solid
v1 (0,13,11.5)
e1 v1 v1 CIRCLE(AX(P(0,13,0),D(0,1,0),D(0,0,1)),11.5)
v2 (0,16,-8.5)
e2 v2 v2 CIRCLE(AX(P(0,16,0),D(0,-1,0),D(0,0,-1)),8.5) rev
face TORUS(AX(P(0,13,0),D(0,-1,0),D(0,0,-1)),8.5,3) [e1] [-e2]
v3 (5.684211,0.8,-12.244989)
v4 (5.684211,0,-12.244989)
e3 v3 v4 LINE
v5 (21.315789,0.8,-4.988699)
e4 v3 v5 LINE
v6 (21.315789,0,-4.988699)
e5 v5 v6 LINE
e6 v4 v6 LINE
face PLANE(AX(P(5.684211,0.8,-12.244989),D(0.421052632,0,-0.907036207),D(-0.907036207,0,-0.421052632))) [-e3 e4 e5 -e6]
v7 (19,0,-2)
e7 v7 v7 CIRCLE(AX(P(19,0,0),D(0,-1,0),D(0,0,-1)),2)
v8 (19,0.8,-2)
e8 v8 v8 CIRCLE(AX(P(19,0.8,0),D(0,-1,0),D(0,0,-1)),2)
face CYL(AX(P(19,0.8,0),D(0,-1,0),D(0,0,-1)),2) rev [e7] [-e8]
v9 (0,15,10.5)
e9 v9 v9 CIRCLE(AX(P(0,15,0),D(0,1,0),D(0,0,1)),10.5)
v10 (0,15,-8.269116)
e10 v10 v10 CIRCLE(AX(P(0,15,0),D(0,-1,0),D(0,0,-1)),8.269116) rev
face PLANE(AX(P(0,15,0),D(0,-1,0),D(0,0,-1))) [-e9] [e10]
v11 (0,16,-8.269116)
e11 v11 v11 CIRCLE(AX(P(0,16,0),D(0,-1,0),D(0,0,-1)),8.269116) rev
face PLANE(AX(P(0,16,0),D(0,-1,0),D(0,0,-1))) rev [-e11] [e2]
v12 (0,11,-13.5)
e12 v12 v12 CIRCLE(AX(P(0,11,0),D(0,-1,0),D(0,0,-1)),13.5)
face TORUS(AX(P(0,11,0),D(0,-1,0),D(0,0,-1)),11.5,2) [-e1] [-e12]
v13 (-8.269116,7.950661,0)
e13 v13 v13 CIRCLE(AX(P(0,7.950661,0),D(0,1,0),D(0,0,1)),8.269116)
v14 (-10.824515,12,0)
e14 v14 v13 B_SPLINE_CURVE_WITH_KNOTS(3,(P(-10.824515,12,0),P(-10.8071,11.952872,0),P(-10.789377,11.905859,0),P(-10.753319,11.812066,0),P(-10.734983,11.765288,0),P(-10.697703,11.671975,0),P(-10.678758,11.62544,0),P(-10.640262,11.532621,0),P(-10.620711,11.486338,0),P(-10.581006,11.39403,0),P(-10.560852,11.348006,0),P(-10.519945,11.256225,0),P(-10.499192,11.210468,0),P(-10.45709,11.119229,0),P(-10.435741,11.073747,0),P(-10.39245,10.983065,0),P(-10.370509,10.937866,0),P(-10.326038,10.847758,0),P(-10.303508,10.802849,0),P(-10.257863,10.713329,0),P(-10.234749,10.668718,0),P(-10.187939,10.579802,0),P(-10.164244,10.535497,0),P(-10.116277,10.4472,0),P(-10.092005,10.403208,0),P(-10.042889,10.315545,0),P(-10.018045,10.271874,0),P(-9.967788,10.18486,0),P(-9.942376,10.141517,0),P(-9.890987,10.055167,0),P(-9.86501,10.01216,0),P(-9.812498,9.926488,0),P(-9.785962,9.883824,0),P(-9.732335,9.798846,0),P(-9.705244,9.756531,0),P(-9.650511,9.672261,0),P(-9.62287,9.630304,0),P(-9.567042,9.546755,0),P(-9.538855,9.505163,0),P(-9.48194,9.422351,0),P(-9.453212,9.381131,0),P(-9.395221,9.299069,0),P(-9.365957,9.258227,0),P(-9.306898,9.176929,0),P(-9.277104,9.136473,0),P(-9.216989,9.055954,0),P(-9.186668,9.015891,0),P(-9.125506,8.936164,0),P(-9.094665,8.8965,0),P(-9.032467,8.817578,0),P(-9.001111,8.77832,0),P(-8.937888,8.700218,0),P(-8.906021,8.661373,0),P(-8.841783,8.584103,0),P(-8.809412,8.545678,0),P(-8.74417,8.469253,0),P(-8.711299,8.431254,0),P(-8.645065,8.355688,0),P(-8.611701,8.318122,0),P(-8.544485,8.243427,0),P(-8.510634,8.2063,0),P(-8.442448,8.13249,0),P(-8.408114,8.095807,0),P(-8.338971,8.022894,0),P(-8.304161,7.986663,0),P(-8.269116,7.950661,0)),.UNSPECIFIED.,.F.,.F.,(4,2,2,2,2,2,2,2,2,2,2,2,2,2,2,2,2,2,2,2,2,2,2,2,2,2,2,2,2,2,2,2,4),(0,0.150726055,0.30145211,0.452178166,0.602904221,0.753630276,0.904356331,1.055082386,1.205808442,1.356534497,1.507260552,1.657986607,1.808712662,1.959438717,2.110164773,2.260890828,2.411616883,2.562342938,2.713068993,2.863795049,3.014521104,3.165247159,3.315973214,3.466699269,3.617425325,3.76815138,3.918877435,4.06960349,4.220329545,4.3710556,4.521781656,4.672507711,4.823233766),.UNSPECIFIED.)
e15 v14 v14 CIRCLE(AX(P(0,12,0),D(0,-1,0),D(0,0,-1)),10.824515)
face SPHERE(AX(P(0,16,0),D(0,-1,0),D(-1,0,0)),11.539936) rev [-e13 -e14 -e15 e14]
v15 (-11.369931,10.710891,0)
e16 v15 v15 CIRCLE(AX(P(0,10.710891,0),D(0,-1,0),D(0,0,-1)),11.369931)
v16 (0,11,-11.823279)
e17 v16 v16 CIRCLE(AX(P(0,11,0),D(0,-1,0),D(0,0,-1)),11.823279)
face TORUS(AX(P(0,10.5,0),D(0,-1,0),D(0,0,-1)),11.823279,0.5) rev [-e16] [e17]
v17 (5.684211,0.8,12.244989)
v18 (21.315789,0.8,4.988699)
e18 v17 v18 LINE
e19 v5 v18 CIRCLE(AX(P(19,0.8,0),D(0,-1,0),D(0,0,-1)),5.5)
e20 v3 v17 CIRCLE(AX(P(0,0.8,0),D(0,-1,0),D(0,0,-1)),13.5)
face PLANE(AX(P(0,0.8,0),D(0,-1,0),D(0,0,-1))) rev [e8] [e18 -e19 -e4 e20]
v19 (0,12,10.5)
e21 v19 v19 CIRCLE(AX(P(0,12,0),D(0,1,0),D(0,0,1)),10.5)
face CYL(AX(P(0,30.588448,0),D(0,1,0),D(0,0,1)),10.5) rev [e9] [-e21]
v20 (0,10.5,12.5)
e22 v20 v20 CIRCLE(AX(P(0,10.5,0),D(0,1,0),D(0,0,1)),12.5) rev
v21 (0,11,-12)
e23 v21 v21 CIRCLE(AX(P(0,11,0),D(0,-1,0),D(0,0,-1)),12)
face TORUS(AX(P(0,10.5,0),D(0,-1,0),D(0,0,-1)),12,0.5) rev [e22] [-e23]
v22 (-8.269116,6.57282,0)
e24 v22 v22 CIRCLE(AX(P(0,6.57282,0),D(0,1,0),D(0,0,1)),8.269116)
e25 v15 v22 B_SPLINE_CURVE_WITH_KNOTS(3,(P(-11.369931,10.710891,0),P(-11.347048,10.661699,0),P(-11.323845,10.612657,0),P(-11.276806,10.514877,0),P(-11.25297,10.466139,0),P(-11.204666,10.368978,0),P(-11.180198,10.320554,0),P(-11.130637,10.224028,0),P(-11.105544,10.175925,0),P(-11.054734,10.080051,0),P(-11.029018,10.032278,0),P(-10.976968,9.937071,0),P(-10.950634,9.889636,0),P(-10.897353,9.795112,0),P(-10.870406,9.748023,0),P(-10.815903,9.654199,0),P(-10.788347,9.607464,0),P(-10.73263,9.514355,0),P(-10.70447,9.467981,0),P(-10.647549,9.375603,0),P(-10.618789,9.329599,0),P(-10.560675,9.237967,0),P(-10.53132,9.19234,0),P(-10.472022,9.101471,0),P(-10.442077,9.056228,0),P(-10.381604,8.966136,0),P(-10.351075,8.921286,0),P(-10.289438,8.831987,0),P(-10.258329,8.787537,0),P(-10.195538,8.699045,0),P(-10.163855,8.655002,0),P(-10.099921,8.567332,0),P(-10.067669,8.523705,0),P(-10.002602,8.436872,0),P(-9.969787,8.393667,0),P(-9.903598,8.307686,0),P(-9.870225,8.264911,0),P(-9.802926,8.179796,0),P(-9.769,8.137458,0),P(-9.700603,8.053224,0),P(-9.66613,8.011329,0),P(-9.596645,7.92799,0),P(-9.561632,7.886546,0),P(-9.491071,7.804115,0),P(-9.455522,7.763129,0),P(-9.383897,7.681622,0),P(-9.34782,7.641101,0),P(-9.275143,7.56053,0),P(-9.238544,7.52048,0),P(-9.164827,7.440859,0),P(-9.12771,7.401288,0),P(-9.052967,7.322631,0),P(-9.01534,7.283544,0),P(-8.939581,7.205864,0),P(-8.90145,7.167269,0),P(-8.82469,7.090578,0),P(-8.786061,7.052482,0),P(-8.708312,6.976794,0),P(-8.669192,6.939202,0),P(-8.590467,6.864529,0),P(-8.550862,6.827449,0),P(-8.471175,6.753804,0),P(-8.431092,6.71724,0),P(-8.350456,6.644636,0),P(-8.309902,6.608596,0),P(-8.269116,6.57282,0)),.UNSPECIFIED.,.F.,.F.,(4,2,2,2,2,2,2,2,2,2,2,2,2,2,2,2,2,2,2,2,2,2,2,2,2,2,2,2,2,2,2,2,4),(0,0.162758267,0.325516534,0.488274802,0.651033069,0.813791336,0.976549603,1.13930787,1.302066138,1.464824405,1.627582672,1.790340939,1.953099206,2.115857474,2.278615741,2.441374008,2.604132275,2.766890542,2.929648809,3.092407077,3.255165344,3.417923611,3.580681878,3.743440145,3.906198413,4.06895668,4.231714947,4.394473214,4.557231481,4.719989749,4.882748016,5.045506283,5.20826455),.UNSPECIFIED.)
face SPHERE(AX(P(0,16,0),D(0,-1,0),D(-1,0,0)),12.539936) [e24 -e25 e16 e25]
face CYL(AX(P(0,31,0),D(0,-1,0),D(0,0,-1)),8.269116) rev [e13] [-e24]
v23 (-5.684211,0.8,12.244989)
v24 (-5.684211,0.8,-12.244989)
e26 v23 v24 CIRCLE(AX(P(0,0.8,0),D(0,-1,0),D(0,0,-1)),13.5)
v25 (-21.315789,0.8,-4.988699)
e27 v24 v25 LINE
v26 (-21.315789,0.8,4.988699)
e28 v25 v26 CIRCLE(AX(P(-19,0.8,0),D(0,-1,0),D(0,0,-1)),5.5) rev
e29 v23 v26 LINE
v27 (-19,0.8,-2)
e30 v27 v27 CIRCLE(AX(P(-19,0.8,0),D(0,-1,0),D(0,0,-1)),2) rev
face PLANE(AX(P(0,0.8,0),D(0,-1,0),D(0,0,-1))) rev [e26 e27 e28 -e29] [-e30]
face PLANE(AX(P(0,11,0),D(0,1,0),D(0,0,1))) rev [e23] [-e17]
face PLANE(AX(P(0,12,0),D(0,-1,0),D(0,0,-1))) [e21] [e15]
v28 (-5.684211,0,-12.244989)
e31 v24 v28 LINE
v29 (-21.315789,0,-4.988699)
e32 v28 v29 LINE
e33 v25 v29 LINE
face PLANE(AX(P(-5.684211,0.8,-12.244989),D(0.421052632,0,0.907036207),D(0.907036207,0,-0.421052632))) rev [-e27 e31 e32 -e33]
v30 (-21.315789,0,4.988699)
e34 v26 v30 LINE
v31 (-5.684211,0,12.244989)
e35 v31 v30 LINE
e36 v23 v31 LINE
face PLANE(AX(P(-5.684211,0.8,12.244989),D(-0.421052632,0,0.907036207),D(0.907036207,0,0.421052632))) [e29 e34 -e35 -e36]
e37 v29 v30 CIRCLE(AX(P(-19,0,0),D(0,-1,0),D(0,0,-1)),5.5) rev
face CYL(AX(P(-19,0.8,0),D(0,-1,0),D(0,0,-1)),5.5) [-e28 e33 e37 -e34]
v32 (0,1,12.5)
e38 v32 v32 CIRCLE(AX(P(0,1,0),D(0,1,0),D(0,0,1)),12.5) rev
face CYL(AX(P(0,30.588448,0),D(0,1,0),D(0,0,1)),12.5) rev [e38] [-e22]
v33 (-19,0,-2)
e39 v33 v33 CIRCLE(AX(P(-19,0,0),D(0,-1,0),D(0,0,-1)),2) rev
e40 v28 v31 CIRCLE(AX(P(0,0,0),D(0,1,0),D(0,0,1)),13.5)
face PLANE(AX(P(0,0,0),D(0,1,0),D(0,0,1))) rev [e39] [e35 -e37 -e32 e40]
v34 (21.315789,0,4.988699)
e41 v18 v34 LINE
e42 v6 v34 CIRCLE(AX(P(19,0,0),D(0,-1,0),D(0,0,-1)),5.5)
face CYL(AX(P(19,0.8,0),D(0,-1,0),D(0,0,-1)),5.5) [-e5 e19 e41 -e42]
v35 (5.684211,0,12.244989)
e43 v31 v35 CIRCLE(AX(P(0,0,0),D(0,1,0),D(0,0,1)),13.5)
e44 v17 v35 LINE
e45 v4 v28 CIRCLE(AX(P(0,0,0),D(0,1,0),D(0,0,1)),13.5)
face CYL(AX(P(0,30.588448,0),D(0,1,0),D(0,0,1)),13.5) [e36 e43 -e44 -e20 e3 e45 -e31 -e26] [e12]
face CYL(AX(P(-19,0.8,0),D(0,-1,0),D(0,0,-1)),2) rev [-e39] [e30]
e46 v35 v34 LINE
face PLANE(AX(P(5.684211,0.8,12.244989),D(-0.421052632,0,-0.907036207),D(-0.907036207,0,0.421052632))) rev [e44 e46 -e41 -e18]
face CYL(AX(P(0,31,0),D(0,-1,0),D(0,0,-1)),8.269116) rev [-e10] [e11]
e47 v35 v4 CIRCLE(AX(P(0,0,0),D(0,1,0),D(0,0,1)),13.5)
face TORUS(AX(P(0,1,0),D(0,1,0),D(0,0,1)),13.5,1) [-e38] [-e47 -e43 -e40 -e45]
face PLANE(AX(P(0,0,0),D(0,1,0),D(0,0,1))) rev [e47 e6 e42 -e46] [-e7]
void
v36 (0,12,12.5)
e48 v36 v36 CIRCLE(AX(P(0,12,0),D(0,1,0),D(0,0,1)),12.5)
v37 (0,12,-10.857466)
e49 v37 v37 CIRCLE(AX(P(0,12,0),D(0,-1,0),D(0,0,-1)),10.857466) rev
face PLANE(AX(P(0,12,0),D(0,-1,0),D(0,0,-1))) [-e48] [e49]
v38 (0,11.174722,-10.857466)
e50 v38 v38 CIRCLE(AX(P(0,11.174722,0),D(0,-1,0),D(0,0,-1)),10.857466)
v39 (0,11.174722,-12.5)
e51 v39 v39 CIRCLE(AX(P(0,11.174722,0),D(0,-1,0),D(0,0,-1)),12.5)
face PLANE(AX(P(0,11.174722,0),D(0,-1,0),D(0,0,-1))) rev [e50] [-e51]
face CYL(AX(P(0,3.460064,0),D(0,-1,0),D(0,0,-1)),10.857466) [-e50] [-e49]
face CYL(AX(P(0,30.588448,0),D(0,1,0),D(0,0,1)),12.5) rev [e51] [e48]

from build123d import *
from build123d.topology import SkipClean

# Parameters (mm, degrees)
FILLET_1_R          = 2
FILLET_2_R          = 3
EXTRUDE_START       = -0.8
SKETCH_2_R          = 2
EXTRUDE_1_DEPTH     = 0.8
FILLET_3_R          = 1
SKETCH_5_R          = 8.269115691
CUT_EXTRUDE_1_DEPTH = 15


with BuildPart() as part:
    # 草图1 → 旋转1 (revolve)
    with BuildSketch(Plane.XY, mode=Mode.PRIVATE) as revolve_1_sk:
        with BuildLine():
            Line((0, 1), (0, 0))
            Line((0, 0), (13.5, 0))
            Line((13.5, 0), (13.5, 13))
            Line((13.5, 13), (11.5, 13))
            Line((11.5, 13), (11.5, 16))
            Line((11.5, 16), (8.000244137, 16))
            ThreePointArc((8.000244137, 16), (5.65702688, 21.65702688), (0, 24.000244137))
            Line((0, 24.000244137), (0, 7.999755863))
            ThreePointArc((0, 7.999755863), (5.291675638, 9.99982707), (7.9375, 15))
            Line((7.9375, 15), (10.5, 15))
            Line((10.5, 15), (10.5, 12))
            Line((10.5, 12), (12.5, 12))
            Line((12.5, 12), (12.5, 1))
            Line((12.5, 1), (0, 1))
        make_face()
    revolve(revolve_1_sk.sketch.rotate(Axis((0, 30.588447592, 0), (0, -1, 0)), 90), axis=Axis((0, 30.588447592, 0), (0, -1, 0)))

    # 圆角1
    fillet_1_edges = [part.edges().sort_by_distance(p)[0] for p in [
        (0, 13, -13.5),
    ]]
    fillet(fillet_1_edges, radius=FILLET_1_R - 0.0001)  # a hair under: the kernel refuses the full size

    # 圆角2
    fillet_2_edges = [part.edges().sort_by_distance(p)[0] for p in [
        (0, 16, -11.5),
    ]]
    fillet(fillet_2_edges, radius=FILLET_2_R - 0.0001)  # a hair under: the kernel refuses the full size

    # 草图2 → 凸台-拉伸1 (add)
    # profile 1 of 2: a face of its own
    with BuildSketch(Plane.XZ.offset(EXTRUDE_START)):
        with BuildLine():
            ThreePointArc((-5.684210526, -12.244988799), (-13.5, 0), (-5.684210526, 12.244988799))
            Line((-5.684210526, 12.244988799), (-21.315789474, 4.98869914))
            ThreePointArc((-21.315789474, 4.98869914), (-24.5, 0), (-21.315789474, -4.98869914))
            Line((-21.315789474, -4.98869914), (-5.684210526, -12.244988799))
        make_face()
        with Locations(Location((-19, 0, 0), (0, 0, 270))):
            Circle(SKETCH_2_R, mode=Mode.SUBTRACT)
    # profile 2 of 2: a face of its own
    with BuildSketch(Plane.XZ.offset(EXTRUDE_START)):
        with BuildLine():
            Line((21.315789474, 4.98869914), (5.684210526, 12.244988799))
            ThreePointArc((5.684210526, 12.244988799), (11.379517611, 7.263372422), (13.5, 0))
            ThreePointArc((13.5, 0), (11.379517611, -7.263372422), (5.684210526, -12.244988799))
            Line((5.684210526, -12.244988799), (21.315789474, -4.98869914))
            ThreePointArc((21.315789474, -4.98869914), (24.5, 0), (21.315789474, 4.98869914))
        make_face()
        with Locations(Location((19, 0, 0), (0, 0, 270))):
            Circle(SKETCH_2_R, mode=Mode.SUBTRACT)
    extrude(amount=EXTRUDE_1_DEPTH)

    # 草图3 → 切除-旋转1 (revolve, cut)
    with SkipClean():  # the faces are left unmerged after this step: merging them gives an invalid solid
        with BuildSketch(Plane.XY):
            with BuildLine():
                Line((0, 0), (12.5, 0))
                Line((12.5, 0), (12.5, 10.5))
                ThreePointArc((12.5, 10.5), (12.353553391, 10.853553391), (12, 11))
                Line((12, 11), (11.823279418, 11))
                ThreePointArc((11.823279418, 11), (11.554434948, 10.921571643), (11.369930597, 10.710890602))
                ThreePointArc((11.369930597, 10.710890602), (6.742585023, 5.427036971), (0, 3.460063796))
                Line((0, 3.460063796), (0, 0))
            make_face()
        revolve(axis=Axis((0, 3.460063796, 0), (0, -1, 0)), mode=Mode.SUBTRACT)

    # 草图4 → 旋转2 (revolve)
    with SkipClean():  # the faces are left unmerged after this step: merging them gives an invalid solid
        with BuildSketch(Plane.XY, mode=Mode.PRIVATE) as revolve_2_sk:
            with BuildLine():
                ThreePointArc((0, 4.460063796), (6.63523651, 6.558402463), (10.857466035, 12.090324963))
                Line((10.857466035, 12.090324963), (10.857466035, 11.174722069))
                Line((10.857466035, 11.174722069), (12.5, 11.174722069))
                Line((12.5, 11.174722069), (12.5, 10.5))
                ThreePointArc((12.5, 10.5), (12.353553391, 10.853553391), (12, 11))
                Line((12, 11), (11.823279418, 11))
                ThreePointArc((11.823279418, 11), (11.554434948, 10.921571643), (11.369930597, 10.710890602))
                ThreePointArc((11.369930597, 10.710890602), (6.742585023, 5.427036971), (0, 3.460063796))
                Line((0, 3.460063796), (0, 4.460063796))
            make_face()
        revolve(revolve_2_sk.sketch.rotate(Axis((0, 3.460063796, 0), (0, 1, 0)), 90), axis=Axis((0, 3.460063796, 0), (0, 1, 0)))

    # 圆角3
    fillet_3_edges = [part.edges().sort_by_distance(p)[0] for p in [
        (-12.5, 0, 0),
    ]]
    fillet(fillet_3_edges, radius=FILLET_3_R - 0.0001)  # a hair under: the kernel refuses the full size

    # 草图5 → 切除-拉伸1 (cut, symmetric)
    with BuildSketch(Plane(origin=(0, 16, 0), x_dir=(1, 0, 0), z_dir=(0, 1, 0))):
        with Locations(Location((0, 0, 0), (0, 0, 180))):
            Circle(SKETCH_5_R)
    extrude(amount=CUT_EXTRUDE_1_DEPTH, both=True, mode=Mode.SUBTRACT)


solid = part.part
